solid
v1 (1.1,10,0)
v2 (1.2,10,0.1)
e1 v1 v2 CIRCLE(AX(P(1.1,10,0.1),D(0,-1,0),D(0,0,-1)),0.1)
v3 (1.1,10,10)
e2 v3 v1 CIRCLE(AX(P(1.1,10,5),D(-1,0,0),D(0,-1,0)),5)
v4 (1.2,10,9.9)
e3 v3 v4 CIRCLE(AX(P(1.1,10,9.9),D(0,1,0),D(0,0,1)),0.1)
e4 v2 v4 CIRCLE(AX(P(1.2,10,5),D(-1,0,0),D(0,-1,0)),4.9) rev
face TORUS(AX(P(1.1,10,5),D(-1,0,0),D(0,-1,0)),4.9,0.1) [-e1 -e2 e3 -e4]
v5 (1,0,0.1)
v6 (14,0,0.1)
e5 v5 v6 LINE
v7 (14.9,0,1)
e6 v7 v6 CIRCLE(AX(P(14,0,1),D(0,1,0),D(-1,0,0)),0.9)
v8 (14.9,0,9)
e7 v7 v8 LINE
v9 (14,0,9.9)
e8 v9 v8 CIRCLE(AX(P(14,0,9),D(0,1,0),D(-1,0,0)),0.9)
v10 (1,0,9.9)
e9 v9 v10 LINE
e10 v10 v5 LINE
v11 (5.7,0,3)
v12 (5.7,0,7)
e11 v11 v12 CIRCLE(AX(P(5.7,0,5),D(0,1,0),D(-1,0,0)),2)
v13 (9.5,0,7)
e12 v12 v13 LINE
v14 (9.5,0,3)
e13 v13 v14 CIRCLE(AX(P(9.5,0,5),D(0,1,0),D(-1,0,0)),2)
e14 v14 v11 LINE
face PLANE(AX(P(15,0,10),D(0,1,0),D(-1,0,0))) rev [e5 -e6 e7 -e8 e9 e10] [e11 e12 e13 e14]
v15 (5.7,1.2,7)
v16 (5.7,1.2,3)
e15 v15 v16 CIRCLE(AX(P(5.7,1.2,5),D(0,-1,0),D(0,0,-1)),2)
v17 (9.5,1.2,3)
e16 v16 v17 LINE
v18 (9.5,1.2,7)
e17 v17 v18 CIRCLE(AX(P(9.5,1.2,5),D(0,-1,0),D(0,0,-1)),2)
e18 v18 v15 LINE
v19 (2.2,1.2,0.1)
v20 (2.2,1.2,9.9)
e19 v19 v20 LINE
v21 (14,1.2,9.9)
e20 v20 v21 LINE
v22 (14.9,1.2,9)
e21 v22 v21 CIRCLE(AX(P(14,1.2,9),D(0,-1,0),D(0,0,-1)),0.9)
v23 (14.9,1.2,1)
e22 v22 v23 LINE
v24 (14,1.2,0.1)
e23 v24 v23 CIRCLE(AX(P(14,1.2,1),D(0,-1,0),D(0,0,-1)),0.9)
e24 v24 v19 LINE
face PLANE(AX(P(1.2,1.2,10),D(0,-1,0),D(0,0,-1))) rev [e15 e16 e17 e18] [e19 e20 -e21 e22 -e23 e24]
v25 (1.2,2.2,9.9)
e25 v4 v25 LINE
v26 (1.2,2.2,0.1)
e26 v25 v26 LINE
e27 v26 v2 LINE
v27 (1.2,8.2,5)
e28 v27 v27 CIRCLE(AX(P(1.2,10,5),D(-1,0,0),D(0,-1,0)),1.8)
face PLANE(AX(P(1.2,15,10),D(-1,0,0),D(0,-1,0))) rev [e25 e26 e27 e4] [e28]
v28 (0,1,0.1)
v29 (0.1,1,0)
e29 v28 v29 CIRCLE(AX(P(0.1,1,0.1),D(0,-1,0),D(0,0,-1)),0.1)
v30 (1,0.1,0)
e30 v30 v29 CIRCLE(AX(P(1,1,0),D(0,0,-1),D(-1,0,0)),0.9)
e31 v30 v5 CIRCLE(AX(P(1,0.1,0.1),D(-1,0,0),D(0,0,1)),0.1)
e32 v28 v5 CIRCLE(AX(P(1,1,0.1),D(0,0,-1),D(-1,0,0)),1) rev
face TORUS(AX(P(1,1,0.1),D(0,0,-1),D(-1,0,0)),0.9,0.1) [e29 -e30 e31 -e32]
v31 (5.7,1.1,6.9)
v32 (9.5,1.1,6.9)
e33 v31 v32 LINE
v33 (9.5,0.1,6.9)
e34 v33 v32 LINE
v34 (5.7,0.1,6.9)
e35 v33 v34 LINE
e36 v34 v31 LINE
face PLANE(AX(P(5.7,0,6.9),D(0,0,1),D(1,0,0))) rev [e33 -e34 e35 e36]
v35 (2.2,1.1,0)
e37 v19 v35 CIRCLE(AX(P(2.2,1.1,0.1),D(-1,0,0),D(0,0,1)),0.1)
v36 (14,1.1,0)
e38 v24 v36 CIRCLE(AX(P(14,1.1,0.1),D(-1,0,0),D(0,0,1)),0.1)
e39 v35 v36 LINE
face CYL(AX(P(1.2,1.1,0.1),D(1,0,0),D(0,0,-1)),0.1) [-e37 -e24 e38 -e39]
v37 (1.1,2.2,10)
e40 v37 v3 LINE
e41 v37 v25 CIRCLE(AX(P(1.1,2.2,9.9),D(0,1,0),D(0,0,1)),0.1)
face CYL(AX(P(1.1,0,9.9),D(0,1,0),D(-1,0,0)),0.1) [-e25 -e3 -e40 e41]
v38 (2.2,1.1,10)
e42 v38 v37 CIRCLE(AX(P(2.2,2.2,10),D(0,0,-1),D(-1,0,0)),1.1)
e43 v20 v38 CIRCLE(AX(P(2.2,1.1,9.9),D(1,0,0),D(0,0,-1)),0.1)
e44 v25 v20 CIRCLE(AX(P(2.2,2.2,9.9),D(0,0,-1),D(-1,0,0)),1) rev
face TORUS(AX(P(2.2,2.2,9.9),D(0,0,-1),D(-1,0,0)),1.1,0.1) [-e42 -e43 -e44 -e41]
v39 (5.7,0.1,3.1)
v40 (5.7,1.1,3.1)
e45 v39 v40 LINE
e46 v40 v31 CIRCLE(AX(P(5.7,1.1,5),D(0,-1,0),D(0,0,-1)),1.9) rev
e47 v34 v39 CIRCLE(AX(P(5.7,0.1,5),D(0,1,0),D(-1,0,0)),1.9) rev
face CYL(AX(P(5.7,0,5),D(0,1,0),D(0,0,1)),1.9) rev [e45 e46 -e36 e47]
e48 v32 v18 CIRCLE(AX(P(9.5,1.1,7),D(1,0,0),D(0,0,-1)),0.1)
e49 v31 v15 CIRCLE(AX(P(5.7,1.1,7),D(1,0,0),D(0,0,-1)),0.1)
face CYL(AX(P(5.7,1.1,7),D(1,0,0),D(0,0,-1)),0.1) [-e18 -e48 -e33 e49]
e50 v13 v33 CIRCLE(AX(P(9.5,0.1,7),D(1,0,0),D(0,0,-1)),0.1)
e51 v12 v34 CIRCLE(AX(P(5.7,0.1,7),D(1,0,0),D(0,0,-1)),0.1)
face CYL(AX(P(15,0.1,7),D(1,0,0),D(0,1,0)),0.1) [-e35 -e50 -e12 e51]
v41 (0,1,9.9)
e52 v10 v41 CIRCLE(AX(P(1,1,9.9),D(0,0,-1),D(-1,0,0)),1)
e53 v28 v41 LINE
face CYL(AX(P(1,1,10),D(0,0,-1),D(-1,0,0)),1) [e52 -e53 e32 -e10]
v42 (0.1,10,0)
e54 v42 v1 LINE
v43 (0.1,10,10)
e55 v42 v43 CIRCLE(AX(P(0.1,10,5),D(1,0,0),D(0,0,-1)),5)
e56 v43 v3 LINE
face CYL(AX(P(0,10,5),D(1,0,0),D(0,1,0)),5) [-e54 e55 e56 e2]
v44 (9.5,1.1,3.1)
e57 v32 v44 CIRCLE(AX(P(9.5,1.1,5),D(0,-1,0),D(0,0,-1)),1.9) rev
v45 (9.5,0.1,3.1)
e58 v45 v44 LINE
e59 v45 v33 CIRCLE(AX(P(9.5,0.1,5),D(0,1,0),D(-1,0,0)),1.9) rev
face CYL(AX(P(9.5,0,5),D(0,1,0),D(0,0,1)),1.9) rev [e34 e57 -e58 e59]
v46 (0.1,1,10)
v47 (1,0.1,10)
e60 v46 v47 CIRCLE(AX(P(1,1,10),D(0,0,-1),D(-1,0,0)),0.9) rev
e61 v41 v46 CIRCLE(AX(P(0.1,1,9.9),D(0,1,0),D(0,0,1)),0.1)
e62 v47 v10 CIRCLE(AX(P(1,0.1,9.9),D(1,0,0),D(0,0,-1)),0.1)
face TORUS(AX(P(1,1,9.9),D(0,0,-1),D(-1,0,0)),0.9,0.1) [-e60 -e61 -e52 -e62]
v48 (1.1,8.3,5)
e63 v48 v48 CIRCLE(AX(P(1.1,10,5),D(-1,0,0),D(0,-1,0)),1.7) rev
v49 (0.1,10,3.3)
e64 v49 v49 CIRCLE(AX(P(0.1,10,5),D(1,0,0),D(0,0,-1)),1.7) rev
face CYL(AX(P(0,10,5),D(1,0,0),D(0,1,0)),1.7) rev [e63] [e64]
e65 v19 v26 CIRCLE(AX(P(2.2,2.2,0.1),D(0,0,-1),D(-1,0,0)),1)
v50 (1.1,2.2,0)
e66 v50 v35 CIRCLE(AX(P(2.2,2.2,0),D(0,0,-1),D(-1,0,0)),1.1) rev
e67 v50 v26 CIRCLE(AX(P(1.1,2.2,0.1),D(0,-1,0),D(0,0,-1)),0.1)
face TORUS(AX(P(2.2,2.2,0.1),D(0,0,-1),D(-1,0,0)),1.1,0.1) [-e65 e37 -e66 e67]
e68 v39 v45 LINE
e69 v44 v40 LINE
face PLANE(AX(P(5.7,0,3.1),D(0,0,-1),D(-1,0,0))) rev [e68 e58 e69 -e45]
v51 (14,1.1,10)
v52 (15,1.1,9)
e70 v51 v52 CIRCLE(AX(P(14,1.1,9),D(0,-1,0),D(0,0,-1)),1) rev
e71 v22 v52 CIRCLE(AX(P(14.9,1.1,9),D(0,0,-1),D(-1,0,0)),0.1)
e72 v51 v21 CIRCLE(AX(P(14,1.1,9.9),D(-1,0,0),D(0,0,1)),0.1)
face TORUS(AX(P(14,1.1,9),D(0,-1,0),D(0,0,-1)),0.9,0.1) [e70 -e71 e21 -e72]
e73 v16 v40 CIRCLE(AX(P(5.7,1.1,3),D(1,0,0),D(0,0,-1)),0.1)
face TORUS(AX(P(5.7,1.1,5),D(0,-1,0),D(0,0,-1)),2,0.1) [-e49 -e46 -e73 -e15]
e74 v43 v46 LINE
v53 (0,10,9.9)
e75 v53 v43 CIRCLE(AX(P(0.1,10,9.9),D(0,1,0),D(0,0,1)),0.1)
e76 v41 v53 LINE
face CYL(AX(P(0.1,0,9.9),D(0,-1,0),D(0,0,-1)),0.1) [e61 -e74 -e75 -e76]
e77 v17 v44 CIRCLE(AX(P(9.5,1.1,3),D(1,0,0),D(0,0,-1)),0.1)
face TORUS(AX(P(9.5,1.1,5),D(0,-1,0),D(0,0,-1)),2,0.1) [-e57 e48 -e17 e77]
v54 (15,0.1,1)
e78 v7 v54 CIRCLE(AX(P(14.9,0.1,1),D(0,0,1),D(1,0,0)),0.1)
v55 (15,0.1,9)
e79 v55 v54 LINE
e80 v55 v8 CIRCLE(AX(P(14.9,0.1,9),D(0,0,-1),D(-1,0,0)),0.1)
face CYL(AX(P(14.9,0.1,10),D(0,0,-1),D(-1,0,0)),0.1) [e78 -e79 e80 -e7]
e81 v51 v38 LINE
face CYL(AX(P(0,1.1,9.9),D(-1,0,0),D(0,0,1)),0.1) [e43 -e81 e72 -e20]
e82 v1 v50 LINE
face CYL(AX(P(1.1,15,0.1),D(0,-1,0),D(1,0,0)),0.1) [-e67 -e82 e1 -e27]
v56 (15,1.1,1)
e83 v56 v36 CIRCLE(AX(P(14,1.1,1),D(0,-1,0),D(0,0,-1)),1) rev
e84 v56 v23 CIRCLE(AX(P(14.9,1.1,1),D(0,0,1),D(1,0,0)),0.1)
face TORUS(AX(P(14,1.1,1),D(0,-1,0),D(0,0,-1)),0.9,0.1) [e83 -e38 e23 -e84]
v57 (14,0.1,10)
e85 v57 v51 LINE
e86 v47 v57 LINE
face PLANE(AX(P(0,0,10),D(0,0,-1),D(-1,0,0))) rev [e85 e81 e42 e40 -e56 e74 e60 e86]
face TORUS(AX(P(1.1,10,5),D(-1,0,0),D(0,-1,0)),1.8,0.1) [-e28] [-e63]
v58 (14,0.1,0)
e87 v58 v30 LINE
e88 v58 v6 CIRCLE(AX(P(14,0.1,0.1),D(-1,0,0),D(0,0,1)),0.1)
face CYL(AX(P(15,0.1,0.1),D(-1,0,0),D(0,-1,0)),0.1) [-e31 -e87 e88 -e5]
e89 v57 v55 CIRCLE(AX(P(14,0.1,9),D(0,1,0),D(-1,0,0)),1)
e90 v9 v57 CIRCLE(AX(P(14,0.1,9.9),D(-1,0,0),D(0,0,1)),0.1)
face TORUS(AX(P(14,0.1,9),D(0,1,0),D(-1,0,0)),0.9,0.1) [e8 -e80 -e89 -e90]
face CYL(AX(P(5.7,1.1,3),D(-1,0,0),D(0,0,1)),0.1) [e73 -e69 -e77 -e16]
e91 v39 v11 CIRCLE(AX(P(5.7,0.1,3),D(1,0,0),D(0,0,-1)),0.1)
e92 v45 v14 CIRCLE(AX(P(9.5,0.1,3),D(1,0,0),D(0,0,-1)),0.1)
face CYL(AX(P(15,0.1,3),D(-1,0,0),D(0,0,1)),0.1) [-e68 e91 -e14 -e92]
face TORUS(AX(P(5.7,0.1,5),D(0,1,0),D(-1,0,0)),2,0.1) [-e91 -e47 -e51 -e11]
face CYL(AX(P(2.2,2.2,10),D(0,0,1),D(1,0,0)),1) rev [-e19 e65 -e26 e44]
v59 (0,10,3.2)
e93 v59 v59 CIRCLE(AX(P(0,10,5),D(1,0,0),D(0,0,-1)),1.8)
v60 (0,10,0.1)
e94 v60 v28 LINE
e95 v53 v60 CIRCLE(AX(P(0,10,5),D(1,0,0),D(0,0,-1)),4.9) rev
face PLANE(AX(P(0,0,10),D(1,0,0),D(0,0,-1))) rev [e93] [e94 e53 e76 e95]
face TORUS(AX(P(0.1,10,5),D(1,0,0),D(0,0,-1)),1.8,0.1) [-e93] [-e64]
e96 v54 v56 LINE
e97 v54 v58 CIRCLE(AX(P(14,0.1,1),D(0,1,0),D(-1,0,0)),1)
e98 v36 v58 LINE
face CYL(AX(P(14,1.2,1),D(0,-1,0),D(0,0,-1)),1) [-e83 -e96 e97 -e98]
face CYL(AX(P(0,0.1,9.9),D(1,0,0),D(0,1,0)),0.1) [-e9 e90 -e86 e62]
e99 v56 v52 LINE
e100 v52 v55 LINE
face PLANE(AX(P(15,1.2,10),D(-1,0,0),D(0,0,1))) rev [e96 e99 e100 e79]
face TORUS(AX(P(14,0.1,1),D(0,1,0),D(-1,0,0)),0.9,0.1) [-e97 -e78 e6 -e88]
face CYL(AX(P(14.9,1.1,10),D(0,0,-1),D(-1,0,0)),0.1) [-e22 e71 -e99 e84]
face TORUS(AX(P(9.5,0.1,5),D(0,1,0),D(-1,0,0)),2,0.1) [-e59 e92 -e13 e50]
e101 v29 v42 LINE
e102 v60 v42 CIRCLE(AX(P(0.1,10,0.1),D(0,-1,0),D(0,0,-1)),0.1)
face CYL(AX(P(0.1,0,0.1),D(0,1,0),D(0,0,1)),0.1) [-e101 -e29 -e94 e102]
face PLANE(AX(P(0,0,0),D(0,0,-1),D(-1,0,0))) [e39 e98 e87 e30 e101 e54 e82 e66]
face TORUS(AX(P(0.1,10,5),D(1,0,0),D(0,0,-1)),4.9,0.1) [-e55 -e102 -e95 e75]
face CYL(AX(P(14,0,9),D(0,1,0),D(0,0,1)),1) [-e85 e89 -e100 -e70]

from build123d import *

# Parameters (mm, degrees)
BOSS_EXTRUDE1_DEPTH = 10
FILLET1_R           = 1
SKETCH2_R           = 1.7
CUT_EXTRUDE1_DEPTH  = 23.703303724
CUT_EXTRUDE2_DEPTH  = 23.703303724
CUT_EXTRUDE3_DEPTH  = 23.703303724
FILLET2_R           = 0.1
FILLET3_R           = 1


with BuildPart() as part:
    # Sketch1 → Boss-Extrude1 (new body)
    with BuildSketch(Plane.XY):
        Polygon((0, 0), (0, 15), (1.2, 15), (1.2, 1.2), (15, 1.2), (15, 0), align=None)
    extrude(amount=BOSS_EXTRUDE1_DEPTH)

    # Fillet1
    fillet1_edges = [part.edges().sort_by_distance(p)[0] for p in [
        (0, 0, 5),
        (1.2, 1.2, 5),
    ]]
    fillet(fillet1_edges, radius=FILLET1_R)

    # Sketch2 → Cut-Extrude1 (cut, through all)
    with BuildSketch(Plane(origin=(1.2, 0, 0), x_dir=(0, 0, -1), z_dir=(1, 0, 0))):
        with Locations(Location((-5, 10, 0), (0, 0, 90))):
            Circle(SKETCH2_R)
    extrude(amount=-CUT_EXTRUDE1_DEPTH, mode=Mode.SUBTRACT)

    # Sketch3 → Cut-Extrude2 (cut, through all)
    with BuildSketch(Plane(origin=(1.2, 0, 0), x_dir=(0, 0, -1), z_dir=(1, 0, 0))):
        with BuildLine():
            Line((0, 10), (1, 10))
            Line((1, 10), (1, 16))
            Line((1, 16), (-11, 16))
            Line((-11, 16), (-11, 10))
            Line((-11, 10), (-10, 10))
            ThreePointArc((-10, 10), (-5, 15), (0, 10))
        make_face()
    extrude(amount=-CUT_EXTRUDE2_DEPTH, mode=Mode.SUBTRACT)

    # Sketch4 → Cut-Extrude3 (cut, through all)
    with BuildSketch(Plane(origin=(0, 1.2, 0), x_dir=(1, 0, 0), z_dir=(0, 1, 0))):
        with BuildLine():
            Line((5.7, -3.1), (9.5, -3.1))
            ThreePointArc((9.5, -3.1), (11.4, -5), (9.5, -6.9))
            Line((9.5, -6.9), (5.7, -6.9))
            ThreePointArc((5.7, -6.9), (3.8, -5), (5.7, -3.1))
        make_face()
    extrude(amount=-CUT_EXTRUDE3_DEPTH, mode=Mode.SUBTRACT)

    # Fillet2
    fillet2_edges = [part.edges().sort_by_distance(p)[0] for p in [
        (15, 1.2, 5),
        (15, 0, 5),
        (8.6, 1.2, 10),
        (8, 0, 0),
        (8, 0, 10),
        (1.2, 6.1, 0),
        (0.292893219, 0.292893219, 0),
        (1.2, 6.1, 10),
        (0.292893219, 0.292893219, 10),
        (1.492893219, 1.492893219, 0),
        (1.492893219, 1.492893219, 10),
        (0, 8.3, 5),
        (1.2, 8.3, 5),
        (0, 5.5, 0),
        (0, 5.5, 10),
        (0, 15, 5),
        (1.2, 15, 5),
        (3.8, 0, 5),
        (7.6, 0, 3.1),
        (11.4, 0, 5),
        (7.6, 0, 6.9),
        (3.8, 1.2, 5),
        (7.6, 1.2, 6.9),
        (11.4, 1.2, 5),
        (7.6, 1.2, 3.1),
        (8.6, 1.2, 0),
    ]]
    fillet(fillet2_edges, radius=FILLET2_R)

    # Fillet3
    # the kernel refuses this fillet: 1 mm, written as the material it takes off along each edge
    with BuildSketch(Plane(origin=(14, 0, 9), x_dir=(1, 0, 0), z_dir=(0, 0, -1))) as fillet3_piece_1:
        with BuildLine():
            CenterArc((0.9, -0.1), 0.1, 0, 90)
            Line((1, -0.1), (1, 0))
            Line((1, 0), (0.9, 0))
        make_face()
    revolve(axis=Axis((14, 0, 9), (0, -1, 0)), revolution_arc=90, mode=Mode.SUBTRACT)
    with BuildSketch(Plane(origin=(14, 0, 1), x_dir=(0, 0, -1), z_dir=(-1, 0, 0))) as fillet3_piece_2:
        with BuildLine():
            CenterArc((0.9, -0.1), 0.1, 0, 90)
            Line((1, -0.1), (1, 0))
            Line((1, 0), (0.9, 0))
        make_face()
    revolve(axis=Axis((14, 0, 1), (0, -1, 0)), revolution_arc=90, mode=Mode.SUBTRACT)
    with BuildSketch(Plane(origin=(14, 1.2, 9), x_dir=(0, 0, 1), z_dir=(-1, 0, 0))) as fillet3_piece_3:
        with BuildLine():
            CenterArc((0.9, -0.1), 0.1, 0, 90)
            Line((1, -0.1), (1, 0))
            Line((1, 0), (0.9, 0))
        make_face()
    revolve(axis=Axis((14, 1.2, 9), (0, 1, 0)), revolution_arc=90, mode=Mode.SUBTRACT)
    with BuildSketch(Plane(origin=(14, 1.2, 1), x_dir=(1, 0, 0), z_dir=(0, 0, 1))) as fillet3_piece_4:
        with BuildLine():
            CenterArc((0.9, -0.1), 0.1, 0, 90)
            Line((1, -0.1), (1, 0))
            Line((1, 0), (0.9, 0))
        make_face()
    revolve(axis=Axis((14, 1.2, 1), (0, 1, 0)), revolution_arc=90, mode=Mode.SUBTRACT)
    with BuildSketch(Plane(origin=(15, 1.2, 0), x_dir=(-1, 0, 0), z_dir=(0, -1, 0))) as fillet3_piece_5:
        with BuildLine():
            CenterArc((FILLET3_R, -FILLET3_R), FILLET3_R, 90, 90)
            Line((0, -FILLET3_R), (0, 0))
            Line((0, 0), (FILLET3_R, 0))
        make_face()
    extrude(amount=1.2, mode=Mode.SUBTRACT)
    with BuildSketch(Plane(origin=(15, 1.2, 10), x_dir=(-1, 0, 0), z_dir=(0, -1, 0))) as fillet3_piece_6:
        with BuildLine():
            CenterArc((FILLET3_R, FILLET3_R), FILLET3_R, 180, 90)
            Line((0, FILLET3_R), (0, 0))
            Line((0, 0), (FILLET3_R, 0))
        make_face()
    extrude(amount=1.2, mode=Mode.SUBTRACT)


solid = part.part
